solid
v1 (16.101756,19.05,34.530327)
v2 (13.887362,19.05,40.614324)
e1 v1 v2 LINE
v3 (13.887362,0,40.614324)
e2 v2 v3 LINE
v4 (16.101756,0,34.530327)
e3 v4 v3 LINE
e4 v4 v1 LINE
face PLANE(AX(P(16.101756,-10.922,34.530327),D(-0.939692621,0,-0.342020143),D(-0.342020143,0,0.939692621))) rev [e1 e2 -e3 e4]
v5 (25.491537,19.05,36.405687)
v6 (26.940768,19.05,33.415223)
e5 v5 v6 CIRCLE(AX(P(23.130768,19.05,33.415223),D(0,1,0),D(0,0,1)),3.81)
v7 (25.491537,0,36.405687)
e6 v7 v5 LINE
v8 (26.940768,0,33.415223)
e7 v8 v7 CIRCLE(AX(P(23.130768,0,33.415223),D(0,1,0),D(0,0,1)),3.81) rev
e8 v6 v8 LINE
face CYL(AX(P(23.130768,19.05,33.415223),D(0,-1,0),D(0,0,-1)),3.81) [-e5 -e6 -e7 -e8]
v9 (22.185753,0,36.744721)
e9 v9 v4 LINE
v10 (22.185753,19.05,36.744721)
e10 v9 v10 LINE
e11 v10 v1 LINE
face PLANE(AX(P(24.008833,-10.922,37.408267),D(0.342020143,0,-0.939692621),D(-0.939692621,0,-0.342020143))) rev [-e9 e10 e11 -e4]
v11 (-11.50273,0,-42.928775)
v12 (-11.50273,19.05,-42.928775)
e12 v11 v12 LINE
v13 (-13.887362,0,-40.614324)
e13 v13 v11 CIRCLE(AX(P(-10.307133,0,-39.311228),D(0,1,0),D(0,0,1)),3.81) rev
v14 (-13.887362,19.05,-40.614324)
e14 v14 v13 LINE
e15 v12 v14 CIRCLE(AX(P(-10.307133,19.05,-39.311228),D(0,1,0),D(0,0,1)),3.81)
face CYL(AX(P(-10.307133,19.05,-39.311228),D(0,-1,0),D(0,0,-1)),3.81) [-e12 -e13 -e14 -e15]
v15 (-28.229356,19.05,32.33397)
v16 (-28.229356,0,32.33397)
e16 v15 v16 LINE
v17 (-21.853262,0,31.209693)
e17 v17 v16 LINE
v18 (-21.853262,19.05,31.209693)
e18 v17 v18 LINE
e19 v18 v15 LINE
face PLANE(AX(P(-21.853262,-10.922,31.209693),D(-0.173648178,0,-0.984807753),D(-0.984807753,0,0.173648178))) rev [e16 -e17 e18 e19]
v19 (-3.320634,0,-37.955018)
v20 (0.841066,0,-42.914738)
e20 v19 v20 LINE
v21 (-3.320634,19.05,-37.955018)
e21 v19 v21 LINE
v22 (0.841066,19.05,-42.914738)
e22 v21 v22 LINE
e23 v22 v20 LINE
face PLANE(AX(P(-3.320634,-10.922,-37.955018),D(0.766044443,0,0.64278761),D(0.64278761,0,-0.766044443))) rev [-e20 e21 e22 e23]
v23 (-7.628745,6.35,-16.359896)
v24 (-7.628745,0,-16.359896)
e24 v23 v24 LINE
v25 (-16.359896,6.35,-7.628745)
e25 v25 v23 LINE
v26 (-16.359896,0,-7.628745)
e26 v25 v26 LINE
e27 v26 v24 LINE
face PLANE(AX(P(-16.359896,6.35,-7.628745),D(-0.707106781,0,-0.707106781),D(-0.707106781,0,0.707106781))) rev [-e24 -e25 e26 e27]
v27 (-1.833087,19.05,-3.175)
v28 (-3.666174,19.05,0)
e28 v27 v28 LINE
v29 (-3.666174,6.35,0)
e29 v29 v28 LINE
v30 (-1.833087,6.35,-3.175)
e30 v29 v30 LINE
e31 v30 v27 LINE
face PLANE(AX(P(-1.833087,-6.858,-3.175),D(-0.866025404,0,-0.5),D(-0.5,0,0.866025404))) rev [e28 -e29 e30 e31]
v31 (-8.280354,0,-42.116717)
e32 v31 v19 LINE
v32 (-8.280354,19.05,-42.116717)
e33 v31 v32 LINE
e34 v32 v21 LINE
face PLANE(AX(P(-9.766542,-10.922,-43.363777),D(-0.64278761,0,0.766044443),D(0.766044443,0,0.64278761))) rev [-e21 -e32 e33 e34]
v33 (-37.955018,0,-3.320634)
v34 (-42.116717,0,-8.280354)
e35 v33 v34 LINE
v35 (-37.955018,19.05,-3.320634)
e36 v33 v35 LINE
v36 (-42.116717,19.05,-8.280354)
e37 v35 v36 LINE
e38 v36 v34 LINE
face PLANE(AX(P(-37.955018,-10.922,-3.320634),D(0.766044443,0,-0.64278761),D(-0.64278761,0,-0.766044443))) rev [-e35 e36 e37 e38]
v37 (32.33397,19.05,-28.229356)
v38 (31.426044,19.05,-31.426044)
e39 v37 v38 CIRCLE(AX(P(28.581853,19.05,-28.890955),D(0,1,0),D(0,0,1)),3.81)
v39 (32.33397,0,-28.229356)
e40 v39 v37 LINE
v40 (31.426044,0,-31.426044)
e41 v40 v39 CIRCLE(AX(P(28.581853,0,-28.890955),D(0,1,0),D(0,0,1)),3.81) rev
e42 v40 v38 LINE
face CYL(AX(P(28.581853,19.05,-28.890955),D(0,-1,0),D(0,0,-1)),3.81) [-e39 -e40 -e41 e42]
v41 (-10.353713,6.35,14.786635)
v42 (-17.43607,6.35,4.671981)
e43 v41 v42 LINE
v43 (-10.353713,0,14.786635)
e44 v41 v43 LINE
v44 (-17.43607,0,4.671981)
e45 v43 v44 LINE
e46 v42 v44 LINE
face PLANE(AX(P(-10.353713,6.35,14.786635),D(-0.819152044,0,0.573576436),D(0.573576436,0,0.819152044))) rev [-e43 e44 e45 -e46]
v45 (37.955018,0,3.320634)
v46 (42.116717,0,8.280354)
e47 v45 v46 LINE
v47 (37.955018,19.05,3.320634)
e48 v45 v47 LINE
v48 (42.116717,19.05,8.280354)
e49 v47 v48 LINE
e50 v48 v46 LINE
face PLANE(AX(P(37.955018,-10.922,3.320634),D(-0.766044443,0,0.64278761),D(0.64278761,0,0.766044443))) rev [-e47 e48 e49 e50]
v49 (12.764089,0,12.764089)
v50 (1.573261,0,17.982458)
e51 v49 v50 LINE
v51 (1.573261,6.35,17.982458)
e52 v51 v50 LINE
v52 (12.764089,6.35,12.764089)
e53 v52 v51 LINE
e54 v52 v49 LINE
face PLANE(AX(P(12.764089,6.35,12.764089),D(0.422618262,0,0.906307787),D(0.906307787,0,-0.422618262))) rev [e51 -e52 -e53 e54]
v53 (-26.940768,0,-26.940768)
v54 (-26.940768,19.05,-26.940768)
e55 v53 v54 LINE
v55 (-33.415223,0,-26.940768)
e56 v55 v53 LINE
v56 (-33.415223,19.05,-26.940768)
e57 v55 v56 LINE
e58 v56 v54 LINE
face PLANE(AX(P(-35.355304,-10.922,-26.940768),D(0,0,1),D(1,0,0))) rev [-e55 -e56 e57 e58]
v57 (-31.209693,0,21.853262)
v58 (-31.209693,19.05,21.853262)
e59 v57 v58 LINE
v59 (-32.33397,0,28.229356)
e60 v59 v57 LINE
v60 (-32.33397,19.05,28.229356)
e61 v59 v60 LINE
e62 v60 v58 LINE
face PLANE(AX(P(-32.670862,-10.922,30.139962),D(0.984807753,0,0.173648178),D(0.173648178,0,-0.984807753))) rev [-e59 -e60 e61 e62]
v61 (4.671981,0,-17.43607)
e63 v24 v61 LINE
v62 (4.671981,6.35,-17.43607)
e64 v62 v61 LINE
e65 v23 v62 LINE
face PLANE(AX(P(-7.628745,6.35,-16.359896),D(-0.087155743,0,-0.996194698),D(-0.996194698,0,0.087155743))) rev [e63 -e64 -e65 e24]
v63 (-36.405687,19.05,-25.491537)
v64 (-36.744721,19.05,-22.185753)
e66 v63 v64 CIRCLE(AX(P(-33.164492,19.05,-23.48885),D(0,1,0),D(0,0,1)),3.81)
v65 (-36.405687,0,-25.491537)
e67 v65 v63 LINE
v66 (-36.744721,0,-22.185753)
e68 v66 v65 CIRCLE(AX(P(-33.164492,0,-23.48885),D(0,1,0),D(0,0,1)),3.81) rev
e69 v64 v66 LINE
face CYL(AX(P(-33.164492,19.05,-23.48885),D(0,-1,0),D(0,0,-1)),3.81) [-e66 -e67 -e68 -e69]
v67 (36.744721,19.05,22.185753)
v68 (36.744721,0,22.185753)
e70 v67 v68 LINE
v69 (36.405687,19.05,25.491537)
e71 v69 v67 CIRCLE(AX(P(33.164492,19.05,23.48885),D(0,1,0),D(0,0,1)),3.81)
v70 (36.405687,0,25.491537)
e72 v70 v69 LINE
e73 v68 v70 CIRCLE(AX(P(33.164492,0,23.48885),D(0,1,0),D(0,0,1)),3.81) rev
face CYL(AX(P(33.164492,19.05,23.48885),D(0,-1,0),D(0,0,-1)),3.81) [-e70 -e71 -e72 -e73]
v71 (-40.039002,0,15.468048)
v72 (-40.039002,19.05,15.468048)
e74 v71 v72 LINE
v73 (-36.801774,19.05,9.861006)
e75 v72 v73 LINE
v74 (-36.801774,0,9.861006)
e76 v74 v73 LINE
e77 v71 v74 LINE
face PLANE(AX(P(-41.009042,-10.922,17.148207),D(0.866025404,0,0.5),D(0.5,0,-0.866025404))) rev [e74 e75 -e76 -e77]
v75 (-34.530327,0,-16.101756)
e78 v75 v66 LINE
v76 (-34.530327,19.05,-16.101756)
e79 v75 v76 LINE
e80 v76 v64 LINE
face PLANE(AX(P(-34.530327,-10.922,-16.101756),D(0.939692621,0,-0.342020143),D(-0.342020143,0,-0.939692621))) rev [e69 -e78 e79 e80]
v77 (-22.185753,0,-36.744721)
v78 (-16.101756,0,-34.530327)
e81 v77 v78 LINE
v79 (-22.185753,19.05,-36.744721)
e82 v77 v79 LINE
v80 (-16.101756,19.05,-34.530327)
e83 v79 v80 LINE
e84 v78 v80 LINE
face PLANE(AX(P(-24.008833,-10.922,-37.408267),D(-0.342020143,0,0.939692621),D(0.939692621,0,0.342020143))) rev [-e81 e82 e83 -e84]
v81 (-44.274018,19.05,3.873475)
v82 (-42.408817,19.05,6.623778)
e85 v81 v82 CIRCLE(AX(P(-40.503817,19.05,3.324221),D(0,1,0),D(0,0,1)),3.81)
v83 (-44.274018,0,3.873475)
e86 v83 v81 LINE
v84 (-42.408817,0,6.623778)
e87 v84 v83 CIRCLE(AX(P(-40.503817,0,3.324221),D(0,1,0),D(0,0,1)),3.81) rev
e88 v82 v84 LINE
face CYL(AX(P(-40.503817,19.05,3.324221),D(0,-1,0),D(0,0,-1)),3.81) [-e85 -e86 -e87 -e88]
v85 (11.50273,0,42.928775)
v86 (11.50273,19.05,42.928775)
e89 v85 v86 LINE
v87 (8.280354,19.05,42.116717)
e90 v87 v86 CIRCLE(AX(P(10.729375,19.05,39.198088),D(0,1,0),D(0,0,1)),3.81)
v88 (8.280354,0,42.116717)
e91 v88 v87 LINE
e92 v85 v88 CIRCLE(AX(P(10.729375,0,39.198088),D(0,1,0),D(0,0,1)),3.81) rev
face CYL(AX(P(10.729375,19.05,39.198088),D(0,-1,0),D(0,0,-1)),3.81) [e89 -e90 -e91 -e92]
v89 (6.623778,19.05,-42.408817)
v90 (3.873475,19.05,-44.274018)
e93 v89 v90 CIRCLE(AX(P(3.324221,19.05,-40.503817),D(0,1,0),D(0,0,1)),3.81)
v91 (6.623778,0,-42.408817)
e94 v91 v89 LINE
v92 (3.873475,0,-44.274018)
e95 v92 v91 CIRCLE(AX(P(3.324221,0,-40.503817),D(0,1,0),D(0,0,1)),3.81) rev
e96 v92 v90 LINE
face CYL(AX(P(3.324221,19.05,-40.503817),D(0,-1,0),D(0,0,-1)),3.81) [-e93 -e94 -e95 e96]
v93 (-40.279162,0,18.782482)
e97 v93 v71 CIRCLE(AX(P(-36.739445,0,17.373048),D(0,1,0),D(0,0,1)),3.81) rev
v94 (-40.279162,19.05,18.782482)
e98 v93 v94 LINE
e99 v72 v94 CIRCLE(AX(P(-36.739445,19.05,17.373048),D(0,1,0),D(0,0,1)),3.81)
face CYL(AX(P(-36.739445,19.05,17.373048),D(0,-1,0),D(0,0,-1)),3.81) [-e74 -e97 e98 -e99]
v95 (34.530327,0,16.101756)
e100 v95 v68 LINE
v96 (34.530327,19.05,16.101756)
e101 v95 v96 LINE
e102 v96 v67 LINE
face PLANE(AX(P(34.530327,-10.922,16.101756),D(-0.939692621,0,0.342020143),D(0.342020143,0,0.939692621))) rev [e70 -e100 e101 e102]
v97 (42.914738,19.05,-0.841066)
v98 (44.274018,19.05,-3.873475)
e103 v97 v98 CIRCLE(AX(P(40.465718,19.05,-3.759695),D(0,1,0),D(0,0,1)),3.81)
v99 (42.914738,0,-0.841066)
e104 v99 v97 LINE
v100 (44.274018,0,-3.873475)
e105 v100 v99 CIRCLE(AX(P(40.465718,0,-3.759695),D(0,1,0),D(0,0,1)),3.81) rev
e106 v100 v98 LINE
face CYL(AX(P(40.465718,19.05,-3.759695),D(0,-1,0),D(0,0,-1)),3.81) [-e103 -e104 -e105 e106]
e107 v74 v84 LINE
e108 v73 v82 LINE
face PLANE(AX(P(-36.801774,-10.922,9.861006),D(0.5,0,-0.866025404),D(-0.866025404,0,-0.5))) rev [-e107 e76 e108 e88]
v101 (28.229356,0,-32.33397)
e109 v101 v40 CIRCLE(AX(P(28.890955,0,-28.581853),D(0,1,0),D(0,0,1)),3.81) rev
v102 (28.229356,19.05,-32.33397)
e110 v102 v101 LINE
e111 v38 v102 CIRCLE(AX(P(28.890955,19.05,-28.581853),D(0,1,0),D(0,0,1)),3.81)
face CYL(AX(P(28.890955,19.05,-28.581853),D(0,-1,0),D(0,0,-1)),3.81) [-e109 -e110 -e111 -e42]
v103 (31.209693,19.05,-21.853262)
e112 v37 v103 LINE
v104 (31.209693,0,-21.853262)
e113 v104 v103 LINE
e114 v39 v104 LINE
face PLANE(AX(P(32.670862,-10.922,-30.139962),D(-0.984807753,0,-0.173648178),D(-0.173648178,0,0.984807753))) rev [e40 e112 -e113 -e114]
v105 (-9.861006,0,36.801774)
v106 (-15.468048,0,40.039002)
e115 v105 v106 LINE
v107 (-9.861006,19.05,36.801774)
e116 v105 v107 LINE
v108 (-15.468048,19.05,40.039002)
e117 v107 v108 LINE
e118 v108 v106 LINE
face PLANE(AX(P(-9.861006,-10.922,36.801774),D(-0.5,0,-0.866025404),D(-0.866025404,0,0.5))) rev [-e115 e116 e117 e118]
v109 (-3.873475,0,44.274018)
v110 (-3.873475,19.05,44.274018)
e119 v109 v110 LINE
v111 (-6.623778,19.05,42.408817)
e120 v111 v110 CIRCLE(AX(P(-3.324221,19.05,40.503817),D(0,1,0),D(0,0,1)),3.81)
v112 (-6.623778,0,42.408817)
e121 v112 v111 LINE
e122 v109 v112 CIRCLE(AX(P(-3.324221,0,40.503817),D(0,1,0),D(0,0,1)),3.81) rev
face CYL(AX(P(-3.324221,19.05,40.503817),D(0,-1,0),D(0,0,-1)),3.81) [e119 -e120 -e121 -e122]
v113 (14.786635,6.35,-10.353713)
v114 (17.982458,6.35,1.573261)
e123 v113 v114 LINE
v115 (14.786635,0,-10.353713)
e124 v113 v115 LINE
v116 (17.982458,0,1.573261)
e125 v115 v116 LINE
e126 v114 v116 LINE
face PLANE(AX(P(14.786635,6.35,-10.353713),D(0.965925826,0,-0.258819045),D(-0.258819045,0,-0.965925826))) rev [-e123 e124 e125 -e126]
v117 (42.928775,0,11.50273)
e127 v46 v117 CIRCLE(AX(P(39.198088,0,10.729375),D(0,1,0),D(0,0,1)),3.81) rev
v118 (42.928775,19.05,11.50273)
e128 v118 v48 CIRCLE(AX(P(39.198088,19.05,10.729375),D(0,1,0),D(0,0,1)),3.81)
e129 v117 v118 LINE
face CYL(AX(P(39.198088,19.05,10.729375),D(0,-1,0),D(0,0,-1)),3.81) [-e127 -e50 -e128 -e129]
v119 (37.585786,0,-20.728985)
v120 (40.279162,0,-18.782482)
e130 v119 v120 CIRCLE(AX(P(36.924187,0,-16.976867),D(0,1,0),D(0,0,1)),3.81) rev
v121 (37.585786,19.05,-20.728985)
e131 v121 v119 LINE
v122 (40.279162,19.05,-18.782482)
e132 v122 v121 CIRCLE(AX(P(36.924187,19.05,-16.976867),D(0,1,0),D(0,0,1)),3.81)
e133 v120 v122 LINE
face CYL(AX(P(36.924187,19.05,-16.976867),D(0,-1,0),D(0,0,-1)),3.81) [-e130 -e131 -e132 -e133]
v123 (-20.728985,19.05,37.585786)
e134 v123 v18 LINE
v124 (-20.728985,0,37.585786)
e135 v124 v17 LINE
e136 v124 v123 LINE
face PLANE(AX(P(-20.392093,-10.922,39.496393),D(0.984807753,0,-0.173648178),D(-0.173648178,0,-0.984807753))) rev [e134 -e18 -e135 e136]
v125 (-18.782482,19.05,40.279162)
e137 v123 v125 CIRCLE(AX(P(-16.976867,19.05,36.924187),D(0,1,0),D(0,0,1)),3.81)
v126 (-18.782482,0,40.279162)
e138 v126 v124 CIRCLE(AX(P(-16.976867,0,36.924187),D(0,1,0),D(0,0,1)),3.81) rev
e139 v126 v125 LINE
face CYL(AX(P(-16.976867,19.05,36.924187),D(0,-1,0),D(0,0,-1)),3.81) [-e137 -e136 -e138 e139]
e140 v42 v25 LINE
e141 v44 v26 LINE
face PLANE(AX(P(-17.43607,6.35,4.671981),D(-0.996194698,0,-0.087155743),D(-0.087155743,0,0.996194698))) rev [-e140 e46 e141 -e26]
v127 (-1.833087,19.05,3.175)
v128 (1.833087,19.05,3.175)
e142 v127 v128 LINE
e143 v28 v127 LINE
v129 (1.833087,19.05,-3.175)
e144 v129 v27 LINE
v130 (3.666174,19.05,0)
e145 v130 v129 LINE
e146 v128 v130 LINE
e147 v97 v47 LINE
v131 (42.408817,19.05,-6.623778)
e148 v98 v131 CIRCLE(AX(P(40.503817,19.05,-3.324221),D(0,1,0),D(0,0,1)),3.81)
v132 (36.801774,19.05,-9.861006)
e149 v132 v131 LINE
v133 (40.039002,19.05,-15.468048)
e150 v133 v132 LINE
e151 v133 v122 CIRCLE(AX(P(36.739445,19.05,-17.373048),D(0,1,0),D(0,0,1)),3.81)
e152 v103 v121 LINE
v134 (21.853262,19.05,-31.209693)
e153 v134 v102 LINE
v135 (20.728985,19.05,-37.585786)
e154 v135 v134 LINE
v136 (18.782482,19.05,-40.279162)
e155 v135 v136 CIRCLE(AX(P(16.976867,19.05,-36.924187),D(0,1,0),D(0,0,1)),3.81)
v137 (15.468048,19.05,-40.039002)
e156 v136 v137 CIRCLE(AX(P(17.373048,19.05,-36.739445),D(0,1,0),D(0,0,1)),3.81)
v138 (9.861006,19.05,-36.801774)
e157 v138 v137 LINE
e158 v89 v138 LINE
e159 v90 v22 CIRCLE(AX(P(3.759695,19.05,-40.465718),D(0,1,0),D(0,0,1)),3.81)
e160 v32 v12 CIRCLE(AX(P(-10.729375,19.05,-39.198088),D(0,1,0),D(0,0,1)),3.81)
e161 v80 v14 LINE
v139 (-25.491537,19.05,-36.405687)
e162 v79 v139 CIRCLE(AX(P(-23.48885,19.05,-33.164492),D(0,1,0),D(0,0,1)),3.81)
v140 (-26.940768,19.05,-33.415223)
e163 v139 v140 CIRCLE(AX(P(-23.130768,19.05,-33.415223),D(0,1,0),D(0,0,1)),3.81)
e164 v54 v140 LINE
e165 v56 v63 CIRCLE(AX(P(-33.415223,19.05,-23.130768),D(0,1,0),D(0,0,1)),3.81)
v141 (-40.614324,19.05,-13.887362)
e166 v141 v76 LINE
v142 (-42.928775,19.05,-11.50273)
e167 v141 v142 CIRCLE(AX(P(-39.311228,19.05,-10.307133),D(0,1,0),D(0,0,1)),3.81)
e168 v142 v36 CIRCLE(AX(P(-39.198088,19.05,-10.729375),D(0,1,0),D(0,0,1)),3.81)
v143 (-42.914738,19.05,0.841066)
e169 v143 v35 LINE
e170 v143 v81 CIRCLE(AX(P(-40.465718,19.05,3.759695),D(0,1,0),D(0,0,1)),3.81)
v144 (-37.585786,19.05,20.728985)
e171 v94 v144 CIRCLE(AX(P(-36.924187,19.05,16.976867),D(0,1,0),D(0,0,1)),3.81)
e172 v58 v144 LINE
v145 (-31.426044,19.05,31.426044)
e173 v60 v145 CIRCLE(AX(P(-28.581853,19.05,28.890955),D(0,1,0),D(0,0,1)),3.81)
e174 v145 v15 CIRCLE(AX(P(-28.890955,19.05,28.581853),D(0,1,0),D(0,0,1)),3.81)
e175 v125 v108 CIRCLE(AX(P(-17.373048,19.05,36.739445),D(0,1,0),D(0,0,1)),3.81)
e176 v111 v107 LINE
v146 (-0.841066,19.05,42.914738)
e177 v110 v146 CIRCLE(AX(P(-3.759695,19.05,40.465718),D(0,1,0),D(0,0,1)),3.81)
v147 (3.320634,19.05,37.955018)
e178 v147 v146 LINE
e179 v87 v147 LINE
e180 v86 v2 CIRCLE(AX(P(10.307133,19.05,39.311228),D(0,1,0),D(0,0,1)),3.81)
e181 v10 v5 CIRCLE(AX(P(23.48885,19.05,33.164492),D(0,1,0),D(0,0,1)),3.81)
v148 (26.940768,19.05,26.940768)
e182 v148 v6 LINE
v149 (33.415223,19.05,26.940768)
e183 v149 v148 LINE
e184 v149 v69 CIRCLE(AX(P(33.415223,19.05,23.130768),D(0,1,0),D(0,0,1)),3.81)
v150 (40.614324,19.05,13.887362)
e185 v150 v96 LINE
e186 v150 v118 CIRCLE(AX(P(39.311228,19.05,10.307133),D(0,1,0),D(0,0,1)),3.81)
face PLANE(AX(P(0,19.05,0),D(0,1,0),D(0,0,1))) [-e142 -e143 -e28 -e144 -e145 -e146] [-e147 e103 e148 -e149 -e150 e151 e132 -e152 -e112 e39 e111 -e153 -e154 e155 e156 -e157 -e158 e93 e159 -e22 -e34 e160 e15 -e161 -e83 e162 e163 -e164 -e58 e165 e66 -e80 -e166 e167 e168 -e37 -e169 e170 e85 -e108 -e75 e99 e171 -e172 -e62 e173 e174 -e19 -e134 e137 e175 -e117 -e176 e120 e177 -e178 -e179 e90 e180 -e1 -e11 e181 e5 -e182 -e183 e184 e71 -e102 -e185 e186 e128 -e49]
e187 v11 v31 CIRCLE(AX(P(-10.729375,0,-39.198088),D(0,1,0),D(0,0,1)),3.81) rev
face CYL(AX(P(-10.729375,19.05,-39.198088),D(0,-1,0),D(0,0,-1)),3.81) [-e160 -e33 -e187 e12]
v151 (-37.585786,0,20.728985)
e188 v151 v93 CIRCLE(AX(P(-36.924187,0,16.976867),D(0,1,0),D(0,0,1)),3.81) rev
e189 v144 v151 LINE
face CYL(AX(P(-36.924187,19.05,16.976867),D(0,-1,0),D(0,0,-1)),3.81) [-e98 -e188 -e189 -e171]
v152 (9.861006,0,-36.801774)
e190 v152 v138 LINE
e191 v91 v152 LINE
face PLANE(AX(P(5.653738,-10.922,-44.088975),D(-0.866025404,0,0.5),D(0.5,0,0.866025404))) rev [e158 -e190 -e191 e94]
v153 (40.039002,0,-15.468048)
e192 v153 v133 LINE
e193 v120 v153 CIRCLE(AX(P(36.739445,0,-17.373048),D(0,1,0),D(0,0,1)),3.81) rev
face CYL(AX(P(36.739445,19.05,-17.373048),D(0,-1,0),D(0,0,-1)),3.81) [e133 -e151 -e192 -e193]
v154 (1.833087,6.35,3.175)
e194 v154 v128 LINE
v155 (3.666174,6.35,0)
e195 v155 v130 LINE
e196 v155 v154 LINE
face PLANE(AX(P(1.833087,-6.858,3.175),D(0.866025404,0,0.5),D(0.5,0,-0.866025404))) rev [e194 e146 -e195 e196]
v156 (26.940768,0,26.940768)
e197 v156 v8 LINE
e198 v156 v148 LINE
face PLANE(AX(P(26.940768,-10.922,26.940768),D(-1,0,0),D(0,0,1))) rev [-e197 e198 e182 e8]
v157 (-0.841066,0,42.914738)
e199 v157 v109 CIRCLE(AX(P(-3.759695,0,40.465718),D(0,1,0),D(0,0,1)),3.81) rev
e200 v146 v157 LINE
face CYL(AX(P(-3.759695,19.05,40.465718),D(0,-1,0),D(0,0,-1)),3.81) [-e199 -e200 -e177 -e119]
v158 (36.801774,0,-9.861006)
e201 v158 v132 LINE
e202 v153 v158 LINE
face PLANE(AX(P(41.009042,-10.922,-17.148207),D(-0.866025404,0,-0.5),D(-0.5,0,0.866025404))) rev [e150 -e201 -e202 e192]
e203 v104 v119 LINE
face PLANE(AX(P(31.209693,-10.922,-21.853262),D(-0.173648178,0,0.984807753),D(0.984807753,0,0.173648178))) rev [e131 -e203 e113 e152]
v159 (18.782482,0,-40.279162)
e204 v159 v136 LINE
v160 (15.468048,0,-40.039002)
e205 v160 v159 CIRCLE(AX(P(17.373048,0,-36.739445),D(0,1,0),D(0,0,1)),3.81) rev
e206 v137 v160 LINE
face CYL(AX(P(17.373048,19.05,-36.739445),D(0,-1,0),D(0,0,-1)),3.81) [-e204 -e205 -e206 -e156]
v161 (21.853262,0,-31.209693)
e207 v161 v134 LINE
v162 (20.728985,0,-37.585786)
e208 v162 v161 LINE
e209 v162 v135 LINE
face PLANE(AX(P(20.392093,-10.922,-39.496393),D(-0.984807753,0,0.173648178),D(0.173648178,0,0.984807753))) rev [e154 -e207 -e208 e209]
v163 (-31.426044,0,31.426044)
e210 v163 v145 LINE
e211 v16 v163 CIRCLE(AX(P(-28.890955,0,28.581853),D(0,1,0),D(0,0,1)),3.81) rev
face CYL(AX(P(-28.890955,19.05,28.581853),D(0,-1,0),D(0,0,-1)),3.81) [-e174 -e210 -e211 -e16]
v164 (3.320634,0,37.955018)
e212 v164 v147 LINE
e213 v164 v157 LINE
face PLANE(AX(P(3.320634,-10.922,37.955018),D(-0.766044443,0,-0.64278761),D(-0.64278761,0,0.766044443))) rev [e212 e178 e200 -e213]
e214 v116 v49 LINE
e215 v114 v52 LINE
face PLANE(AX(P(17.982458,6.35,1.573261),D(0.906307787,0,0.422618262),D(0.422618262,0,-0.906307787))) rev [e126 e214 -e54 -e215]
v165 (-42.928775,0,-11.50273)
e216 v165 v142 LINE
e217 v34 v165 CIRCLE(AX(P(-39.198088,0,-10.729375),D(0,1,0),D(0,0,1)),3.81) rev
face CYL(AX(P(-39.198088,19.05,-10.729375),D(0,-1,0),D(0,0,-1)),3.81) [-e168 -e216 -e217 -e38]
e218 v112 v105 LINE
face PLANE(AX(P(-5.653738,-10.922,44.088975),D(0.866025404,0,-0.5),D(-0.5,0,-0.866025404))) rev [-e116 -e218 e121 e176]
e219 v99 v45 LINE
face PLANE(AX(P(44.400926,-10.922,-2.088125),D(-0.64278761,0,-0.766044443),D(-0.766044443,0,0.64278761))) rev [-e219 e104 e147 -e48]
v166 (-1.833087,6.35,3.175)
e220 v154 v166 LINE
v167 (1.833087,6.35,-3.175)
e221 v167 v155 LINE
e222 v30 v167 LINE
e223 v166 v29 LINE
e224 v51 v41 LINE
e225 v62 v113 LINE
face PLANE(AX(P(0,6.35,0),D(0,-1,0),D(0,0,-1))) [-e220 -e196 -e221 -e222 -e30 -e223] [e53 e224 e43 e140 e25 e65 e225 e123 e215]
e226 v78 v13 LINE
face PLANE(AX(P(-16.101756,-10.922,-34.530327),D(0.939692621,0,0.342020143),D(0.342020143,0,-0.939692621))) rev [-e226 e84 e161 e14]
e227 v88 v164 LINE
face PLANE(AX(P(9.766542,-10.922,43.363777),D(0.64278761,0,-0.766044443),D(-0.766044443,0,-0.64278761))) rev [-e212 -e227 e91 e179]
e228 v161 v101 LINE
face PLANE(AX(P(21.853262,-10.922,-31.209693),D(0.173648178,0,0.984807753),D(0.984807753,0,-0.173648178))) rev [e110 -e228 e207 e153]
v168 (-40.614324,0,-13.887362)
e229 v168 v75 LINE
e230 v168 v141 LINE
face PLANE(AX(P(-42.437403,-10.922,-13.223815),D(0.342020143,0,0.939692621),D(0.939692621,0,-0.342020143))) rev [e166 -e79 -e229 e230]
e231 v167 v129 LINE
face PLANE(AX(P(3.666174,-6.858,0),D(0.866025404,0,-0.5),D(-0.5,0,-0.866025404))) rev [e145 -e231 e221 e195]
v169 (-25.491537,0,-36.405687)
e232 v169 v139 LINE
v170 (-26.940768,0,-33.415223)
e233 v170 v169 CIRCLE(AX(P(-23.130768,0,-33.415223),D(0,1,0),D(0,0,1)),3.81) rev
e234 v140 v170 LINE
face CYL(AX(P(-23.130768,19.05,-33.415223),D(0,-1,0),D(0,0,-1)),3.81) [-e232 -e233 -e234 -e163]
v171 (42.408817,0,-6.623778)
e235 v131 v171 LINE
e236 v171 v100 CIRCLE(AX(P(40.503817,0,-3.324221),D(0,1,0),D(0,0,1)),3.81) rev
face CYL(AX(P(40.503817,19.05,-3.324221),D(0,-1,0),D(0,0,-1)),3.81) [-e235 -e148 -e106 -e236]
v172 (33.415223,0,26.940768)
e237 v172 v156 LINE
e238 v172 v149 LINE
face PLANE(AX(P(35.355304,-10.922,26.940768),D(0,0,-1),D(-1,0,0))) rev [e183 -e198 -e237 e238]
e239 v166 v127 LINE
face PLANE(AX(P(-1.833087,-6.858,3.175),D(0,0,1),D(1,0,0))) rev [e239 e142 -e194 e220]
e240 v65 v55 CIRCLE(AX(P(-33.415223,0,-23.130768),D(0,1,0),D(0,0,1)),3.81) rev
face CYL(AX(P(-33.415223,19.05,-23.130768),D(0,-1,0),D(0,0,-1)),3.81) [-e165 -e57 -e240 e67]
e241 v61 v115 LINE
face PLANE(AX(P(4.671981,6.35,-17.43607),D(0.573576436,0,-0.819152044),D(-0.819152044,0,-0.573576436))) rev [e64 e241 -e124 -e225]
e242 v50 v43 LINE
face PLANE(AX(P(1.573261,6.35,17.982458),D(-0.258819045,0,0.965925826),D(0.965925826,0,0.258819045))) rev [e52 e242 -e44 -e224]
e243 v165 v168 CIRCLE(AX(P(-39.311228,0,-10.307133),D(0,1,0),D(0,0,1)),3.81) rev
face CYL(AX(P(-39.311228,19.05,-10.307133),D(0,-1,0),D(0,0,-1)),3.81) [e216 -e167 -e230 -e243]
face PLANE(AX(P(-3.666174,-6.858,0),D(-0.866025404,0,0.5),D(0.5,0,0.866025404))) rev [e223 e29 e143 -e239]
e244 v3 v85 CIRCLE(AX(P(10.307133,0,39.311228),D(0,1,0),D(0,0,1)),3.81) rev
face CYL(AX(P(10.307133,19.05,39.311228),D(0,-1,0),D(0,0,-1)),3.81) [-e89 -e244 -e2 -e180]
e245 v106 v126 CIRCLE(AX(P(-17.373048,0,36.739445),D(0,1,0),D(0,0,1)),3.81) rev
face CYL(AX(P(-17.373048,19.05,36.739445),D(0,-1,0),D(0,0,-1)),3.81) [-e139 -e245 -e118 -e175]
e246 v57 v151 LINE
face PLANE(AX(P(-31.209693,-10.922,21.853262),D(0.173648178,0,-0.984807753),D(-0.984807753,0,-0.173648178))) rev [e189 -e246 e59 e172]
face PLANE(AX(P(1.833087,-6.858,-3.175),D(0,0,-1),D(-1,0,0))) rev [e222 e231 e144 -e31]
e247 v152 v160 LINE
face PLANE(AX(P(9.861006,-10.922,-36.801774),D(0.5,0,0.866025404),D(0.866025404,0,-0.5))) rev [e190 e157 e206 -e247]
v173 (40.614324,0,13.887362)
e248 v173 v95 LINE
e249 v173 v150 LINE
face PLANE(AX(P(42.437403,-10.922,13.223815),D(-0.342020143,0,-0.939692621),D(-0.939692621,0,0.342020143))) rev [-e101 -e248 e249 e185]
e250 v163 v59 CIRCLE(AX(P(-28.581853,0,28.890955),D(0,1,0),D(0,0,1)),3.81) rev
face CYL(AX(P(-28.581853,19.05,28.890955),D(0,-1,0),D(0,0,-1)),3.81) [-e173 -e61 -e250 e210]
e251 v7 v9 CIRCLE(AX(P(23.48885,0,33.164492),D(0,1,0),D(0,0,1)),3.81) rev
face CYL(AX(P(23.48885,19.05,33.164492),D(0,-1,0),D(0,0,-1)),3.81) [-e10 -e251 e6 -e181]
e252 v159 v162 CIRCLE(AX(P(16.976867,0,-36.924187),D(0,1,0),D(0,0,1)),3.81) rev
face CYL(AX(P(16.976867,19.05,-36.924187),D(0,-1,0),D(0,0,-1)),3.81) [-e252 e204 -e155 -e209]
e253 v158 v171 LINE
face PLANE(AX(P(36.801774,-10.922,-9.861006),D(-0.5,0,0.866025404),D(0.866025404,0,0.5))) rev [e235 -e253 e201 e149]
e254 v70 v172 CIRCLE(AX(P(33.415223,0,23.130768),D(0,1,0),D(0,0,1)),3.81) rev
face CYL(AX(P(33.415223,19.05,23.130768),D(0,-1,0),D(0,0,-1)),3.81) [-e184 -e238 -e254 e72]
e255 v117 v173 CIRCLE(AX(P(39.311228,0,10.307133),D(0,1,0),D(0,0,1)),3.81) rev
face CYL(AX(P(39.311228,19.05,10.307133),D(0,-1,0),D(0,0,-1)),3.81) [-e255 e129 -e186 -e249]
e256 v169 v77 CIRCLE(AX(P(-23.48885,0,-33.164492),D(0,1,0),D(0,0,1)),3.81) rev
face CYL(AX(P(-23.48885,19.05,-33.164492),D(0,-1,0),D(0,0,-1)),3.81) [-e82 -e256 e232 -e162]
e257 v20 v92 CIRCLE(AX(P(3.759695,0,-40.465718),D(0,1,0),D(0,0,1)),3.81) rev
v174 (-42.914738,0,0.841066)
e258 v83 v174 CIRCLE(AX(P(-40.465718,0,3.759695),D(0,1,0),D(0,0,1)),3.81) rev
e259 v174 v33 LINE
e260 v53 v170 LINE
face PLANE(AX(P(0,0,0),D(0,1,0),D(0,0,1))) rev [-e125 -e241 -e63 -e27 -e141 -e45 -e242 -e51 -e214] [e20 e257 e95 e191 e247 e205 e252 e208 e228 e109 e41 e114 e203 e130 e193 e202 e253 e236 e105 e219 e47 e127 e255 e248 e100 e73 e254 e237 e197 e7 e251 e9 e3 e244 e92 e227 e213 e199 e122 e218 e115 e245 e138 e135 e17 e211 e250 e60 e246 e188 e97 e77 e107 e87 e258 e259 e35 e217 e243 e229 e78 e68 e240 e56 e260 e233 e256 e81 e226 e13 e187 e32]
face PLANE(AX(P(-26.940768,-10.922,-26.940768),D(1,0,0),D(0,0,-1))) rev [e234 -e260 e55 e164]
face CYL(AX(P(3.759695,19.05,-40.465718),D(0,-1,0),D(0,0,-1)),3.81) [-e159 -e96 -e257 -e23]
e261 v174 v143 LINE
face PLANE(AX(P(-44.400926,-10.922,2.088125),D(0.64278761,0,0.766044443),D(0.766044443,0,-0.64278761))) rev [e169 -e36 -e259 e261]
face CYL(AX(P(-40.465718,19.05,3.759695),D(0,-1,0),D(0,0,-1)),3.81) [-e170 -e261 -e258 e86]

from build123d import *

# Parameters (mm, degrees)
SKETCH1_R           = 44.45
BOSS_EXTRUDE1_DEPTH = 19.05
SKETCH2_W           = 8.414535341
SKETCH2_H           = 8.414535341
CUT_EXTRUDE1_DEPTH  = 29.972
CIRPATTERN1_COUNT   = 18
CUT_EXTRUDE2_DEPTH  = 6.35
FILLET3_R           = 3.81
CUT_EXTRUDE6_DEPTH  = 25.908


with BuildPart() as part:
    # Sketch1 → Boss-Extrude1 (new body)
    with BuildSketch(Plane(origin=(0, 0, 0), x_dir=(1, 0, 0), z_dir=(0, 1, 0))):
        with Locations(Location((0, 0, 0), (0, 0, 270))):
            Circle(SKETCH1_R)
    extrude(amount=BOSS_EXTRUDE1_DEPTH)

    # Sketch2 → Cut-Extrude1 (cut)
    with BuildSketch(Plane(origin=(0, 19.05, 0), x_dir=(1, 0, 0), z_dir=(0, 1, 0))):
        with Locations((-31.148036033, 31.148036033)):
            Rectangle(SKETCH2_W, SKETCH2_H)
    cut_extrude1 = extrude(amount=-CUT_EXTRUDE1_DEPTH, mode=Mode.SUBTRACT)

    # CirPattern1: Cut-Extrude1 ×18 about axis
    cirpattern1_axis = Axis((0, 0, 0), (0, 1, 0))
    for i in range(1, CIRPATTERN1_COUNT):
        add(cut_extrude1.rotate(cirpattern1_axis, i * 360 / CIRPATTERN1_COUNT), mode=Mode.SUBTRACT)

    # Sketch4 → Cut-Extrude2 (cut)
    with BuildSketch(Plane.XZ):
        Polygon((4.671980957, -17.436070304), (14.786635004, -10.353713294), (17.982458197, 1.573261235), (12.764089347, 12.764089347), (1.573261235, 17.982458197), (-10.353713294, 14.786635004), (-17.436070304, 4.671980957), (-16.359896238, -7.628744902), (-7.628744902, -16.359896238), align=None)
    extrude(amount=-CUT_EXTRUDE2_DEPTH, mode=Mode.SUBTRACT)

    # Fillet3
    # the kernel refuses this fillet: 3.81 mm, written as the material it takes off along each edge
    with BuildSketch(Plane(origin=(-9.766541838, 24.122461368, -43.363777056), x_dir=(-0.9702942077465824, 0, 0.24192798600705953), z_dir=(0, -1, 0)), Plane(origin=(-24.008832539, 24.122461368, -37.408267269), x_dir=(-0.8290340625621466, 0, 0.5591981072139847), z_dir=(0, -1, 0)), Plane(origin=(-35.355303704, 24.122461368, -26.940768363), x_dir=(-0.5877801741930432, 0, 0.8090206838057948), z_dir=(0, -1, 0)), Plane(origin=(35.355303704, 24.122461368, 26.940768363), x_dir=(0.5877801741930427, 0, -0.8090206838057951), z_dir=(0, -1, 0)), Plane(origin=(42.437403453, 24.122461368, 13.223815189), x_dir=(0.2756313221047677, 0, -0.9612634260569668), z_dir=(0, -1, 0)), Plane(origin=(44.400926037, 24.122461368, -2.08812526), x_dir=(-0.06976273531441618, 0, -0.9975636123884285), z_dir=(0, -1, 0)), Plane(origin=(41.009041652, 24.122461368, -17.148206985), x_dir=(-0.40674237726635254, 0, -0.913542904594916), z_dir=(0, -1, 0)), Plane(origin=(32.670861615, 24.122461368, -30.139961867), x_dir=(-0.6946628856418128, 0, -0.7193354400499046), z_dir=(0, -1, 0)), Plane(origin=(20.392093497, 24.122461368, -39.496392529), x_dir=(-0.8987967978765562, 0, -0.43836550517444806), z_dir=(0, -1, 0)), Plane(origin=(5.653737948, 24.122461368, -44.088975348), x_dir=(-0.9945225514593977, 0, -0.10452222078911967), z_dir=(0, -1, 0))) as fillet3_piece_1:
        with BuildLine():
            CenterArc((1.942028067, -3.809007557), FILLET3_R, 88.692212078, 55.30814756)
            Line((-1.140340739, -1.569565093), (0, 0))
            ThreePointArc((0, 0), (1.014492274, 0.0115785), (2.028984547, 0))
        make_face()
    extrude(amount=29.194922737, mode=Mode.SUBTRACT)
    with BuildSketch(Plane(origin=(-13.223815189, 24.122461368, -42.437403453), x_dir=(-0.34202014332566844, 0, 0.9396926207859085), z_dir=(0, -1, 0)), Plane(origin=(-26.940768363, 24.122461368, -35.355303704), x_dir=(0, 0, 1), z_dir=(0, -1, 0)), Plane(origin=(37.408267269, 24.122461368, 24.008832539), x_dir=(-0.3420201433256682, 0, -0.9396926207859086), z_dir=(0, -1, 0)), Plane(origin=(43.363777056, 24.122461368, 9.766541838), x_dir=(-0.6427876096865393, 0, -0.7660444431189782), z_dir=(0, -1, 0)), Plane(origin=(44.088975348, 24.122461368, -5.653737948), x_dir=(-0.8660254037844388, 0, -0.4999999999999997), z_dir=(0, -1, 0)), Plane(origin=(39.496392529, 24.122461368, -20.392093497), x_dir=(-0.984807753012208, 0, -0.1736481776669302), z_dir=(0, -1, 0)), Plane(origin=(30.139961867, 24.122461368, -32.670861615), x_dir=(-0.9848077530122079, 0, 0.17364817766693105), z_dir=(0, -1, 0)), Plane(origin=(17.148206985, 24.122461368, -41.009041652), x_dir=(-0.8660254037844395, 0, 0.49999999999999856), z_dir=(0, -1, 0)), Plane(origin=(2.08812526, 24.122461368, -44.400926037), x_dir=(-0.6427876096865408, 0, 0.7660444431189768), z_dir=(0, -1, 0))) as fillet3_piece_2:
        with BuildLine():
            CenterArc((1.940080303, -3.81), FILLET3_R, 90, 55.30814756)
            ThreePointArc((-1.192596891, -1.641490466), (-0.605665691, -0.81393962), (0, 0))
            Line((0, 0), (1.940080303, 0))
        make_face()
    extrude(amount=29.194922737, mode=Mode.SUBTRACT)
    with BuildSketch(Plane(origin=(-37.408267269, 24.122461368, -24.008832539), x_dir=(0.559198107213983, 0, -0.8290340625621475), z_dir=(0, -1, 0)), Plane(origin=(-43.363777056, 24.122461368, -9.766541838), x_dir=(0.24192798600706303, 0, -0.9702942077465815), z_dir=(0, -1, 0)), Plane(origin=(-44.088975348, 24.122461368, 5.653737948), x_dir=(-0.1045222207891241, 0, -0.9945225514593973), z_dir=(0, -1, 0)), Plane(origin=(-39.496392529, 24.122461368, 20.392093497), x_dir=(-0.43836550517444245, 0, -0.8987967978765589), z_dir=(0, -1, 0)), Plane(origin=(-30.139961867, 24.122461368, 32.670861615), x_dir=(-0.7193354400499047, 0, -0.6946628856418126), z_dir=(0, -1, 0)), Plane(origin=(-17.148206985, 24.122461368, 41.009041652), x_dir=(-0.9135429045949142, 0, -0.4067423772663572), z_dir=(0, -1, 0)), Plane(origin=(-2.08812526, 24.122461368, 44.400926037), x_dir=(-0.9975636123884287, 0, -0.06976273531441333), z_dir=(0, -1, 0)), Plane(origin=(13.223815189, 24.122461368, 42.437403453), x_dir=(-0.9612634260569665, 0, 0.2756313221047693), z_dir=(0, -1, 0)), Plane(origin=(26.940768363, 24.122461368, 35.355303704), x_dir=(-0.809020683805795, 0, 0.587780174193043), z_dir=(0, -1, 0))) as fillet3_piece_3:
        with BuildLine():
            CenterArc((1.942028067, 3.809007557), FILLET3_R, 215.999640362, 55.30814756)
            Line((-1.140340739, 1.569565093), (0, 0))
            ThreePointArc((0, 0), (1.014492274, -0.0115785), (2.028984547, 0))
        make_face()
    extrude(amount=29.194922737, mode=Mode.SUBTRACT)
    with BuildSketch(Plane(origin=(-42.437403453, 24.122461368, -13.223815189), x_dir=(0.9396926207859084, 0, -0.3420201433256688), z_dir=(0, -1, 0)), Plane(origin=(-44.400926037, 24.122461368, 2.08812526), x_dir=(0.7660444431189783, 0, -0.6427876096865389), z_dir=(0, -1, 0)), Plane(origin=(-41.009041652, 24.122461368, 17.148206985), x_dir=(0.4999999999999989, 0, -0.8660254037844393), z_dir=(0, -1, 0)), Plane(origin=(-32.670861615, 24.122461368, 30.139961867), x_dir=(0.173648177666932, 0, -0.9848077530122078), z_dir=(0, -1, 0)), Plane(origin=(-20.392093497, 24.122461368, 39.496392529), x_dir=(-0.17364817766693083, 0, -0.9848077530122079), z_dir=(0, -1, 0)), Plane(origin=(-5.653737948, 24.122461368, 44.088975348), x_dir=(-0.49999999999999867, 0, -0.8660254037844395), z_dir=(0, -1, 0)), Plane(origin=(9.766541838, 24.122461368, 43.363777056), x_dir=(-0.7660444431189792, 0, -0.6427876096865378), z_dir=(0, -1, 0)), Plane(origin=(24.008832539, 24.122461368, 37.408267269), x_dir=(-0.9396926207859089, 0, -0.34202014332566766), z_dir=(0, -1, 0))) as fillet3_piece_4:
        with BuildLine():
            CenterArc((1.940080303, 3.81), FILLET3_R, 214.69185244, 55.30814756)
            ThreePointArc((-1.192596891, 1.641490466), (-0.605665691, 0.81393962), (0, 0))
            Line((0, 0), (1.940080303, 0))
        make_face()
    extrude(amount=29.194922737, mode=Mode.SUBTRACT)

    # Sketch6 → Cut-Extrude6 (cut)
    with BuildSketch(Plane(origin=(0, 19.05, 0), x_dir=(1, 0, 0), z_dir=(0, 1, 0))):
        Polygon((3.666174209, 0), (1.833087105, 3.175), (-1.833087105, 3.175), (-3.666174209, 0), (-1.833087105, -3.175), (1.833087105, -3.175), align=None)
    extrude(amount=-CUT_EXTRUDE6_DEPTH, mode=Mode.SUBTRACT)


solid = part.part
